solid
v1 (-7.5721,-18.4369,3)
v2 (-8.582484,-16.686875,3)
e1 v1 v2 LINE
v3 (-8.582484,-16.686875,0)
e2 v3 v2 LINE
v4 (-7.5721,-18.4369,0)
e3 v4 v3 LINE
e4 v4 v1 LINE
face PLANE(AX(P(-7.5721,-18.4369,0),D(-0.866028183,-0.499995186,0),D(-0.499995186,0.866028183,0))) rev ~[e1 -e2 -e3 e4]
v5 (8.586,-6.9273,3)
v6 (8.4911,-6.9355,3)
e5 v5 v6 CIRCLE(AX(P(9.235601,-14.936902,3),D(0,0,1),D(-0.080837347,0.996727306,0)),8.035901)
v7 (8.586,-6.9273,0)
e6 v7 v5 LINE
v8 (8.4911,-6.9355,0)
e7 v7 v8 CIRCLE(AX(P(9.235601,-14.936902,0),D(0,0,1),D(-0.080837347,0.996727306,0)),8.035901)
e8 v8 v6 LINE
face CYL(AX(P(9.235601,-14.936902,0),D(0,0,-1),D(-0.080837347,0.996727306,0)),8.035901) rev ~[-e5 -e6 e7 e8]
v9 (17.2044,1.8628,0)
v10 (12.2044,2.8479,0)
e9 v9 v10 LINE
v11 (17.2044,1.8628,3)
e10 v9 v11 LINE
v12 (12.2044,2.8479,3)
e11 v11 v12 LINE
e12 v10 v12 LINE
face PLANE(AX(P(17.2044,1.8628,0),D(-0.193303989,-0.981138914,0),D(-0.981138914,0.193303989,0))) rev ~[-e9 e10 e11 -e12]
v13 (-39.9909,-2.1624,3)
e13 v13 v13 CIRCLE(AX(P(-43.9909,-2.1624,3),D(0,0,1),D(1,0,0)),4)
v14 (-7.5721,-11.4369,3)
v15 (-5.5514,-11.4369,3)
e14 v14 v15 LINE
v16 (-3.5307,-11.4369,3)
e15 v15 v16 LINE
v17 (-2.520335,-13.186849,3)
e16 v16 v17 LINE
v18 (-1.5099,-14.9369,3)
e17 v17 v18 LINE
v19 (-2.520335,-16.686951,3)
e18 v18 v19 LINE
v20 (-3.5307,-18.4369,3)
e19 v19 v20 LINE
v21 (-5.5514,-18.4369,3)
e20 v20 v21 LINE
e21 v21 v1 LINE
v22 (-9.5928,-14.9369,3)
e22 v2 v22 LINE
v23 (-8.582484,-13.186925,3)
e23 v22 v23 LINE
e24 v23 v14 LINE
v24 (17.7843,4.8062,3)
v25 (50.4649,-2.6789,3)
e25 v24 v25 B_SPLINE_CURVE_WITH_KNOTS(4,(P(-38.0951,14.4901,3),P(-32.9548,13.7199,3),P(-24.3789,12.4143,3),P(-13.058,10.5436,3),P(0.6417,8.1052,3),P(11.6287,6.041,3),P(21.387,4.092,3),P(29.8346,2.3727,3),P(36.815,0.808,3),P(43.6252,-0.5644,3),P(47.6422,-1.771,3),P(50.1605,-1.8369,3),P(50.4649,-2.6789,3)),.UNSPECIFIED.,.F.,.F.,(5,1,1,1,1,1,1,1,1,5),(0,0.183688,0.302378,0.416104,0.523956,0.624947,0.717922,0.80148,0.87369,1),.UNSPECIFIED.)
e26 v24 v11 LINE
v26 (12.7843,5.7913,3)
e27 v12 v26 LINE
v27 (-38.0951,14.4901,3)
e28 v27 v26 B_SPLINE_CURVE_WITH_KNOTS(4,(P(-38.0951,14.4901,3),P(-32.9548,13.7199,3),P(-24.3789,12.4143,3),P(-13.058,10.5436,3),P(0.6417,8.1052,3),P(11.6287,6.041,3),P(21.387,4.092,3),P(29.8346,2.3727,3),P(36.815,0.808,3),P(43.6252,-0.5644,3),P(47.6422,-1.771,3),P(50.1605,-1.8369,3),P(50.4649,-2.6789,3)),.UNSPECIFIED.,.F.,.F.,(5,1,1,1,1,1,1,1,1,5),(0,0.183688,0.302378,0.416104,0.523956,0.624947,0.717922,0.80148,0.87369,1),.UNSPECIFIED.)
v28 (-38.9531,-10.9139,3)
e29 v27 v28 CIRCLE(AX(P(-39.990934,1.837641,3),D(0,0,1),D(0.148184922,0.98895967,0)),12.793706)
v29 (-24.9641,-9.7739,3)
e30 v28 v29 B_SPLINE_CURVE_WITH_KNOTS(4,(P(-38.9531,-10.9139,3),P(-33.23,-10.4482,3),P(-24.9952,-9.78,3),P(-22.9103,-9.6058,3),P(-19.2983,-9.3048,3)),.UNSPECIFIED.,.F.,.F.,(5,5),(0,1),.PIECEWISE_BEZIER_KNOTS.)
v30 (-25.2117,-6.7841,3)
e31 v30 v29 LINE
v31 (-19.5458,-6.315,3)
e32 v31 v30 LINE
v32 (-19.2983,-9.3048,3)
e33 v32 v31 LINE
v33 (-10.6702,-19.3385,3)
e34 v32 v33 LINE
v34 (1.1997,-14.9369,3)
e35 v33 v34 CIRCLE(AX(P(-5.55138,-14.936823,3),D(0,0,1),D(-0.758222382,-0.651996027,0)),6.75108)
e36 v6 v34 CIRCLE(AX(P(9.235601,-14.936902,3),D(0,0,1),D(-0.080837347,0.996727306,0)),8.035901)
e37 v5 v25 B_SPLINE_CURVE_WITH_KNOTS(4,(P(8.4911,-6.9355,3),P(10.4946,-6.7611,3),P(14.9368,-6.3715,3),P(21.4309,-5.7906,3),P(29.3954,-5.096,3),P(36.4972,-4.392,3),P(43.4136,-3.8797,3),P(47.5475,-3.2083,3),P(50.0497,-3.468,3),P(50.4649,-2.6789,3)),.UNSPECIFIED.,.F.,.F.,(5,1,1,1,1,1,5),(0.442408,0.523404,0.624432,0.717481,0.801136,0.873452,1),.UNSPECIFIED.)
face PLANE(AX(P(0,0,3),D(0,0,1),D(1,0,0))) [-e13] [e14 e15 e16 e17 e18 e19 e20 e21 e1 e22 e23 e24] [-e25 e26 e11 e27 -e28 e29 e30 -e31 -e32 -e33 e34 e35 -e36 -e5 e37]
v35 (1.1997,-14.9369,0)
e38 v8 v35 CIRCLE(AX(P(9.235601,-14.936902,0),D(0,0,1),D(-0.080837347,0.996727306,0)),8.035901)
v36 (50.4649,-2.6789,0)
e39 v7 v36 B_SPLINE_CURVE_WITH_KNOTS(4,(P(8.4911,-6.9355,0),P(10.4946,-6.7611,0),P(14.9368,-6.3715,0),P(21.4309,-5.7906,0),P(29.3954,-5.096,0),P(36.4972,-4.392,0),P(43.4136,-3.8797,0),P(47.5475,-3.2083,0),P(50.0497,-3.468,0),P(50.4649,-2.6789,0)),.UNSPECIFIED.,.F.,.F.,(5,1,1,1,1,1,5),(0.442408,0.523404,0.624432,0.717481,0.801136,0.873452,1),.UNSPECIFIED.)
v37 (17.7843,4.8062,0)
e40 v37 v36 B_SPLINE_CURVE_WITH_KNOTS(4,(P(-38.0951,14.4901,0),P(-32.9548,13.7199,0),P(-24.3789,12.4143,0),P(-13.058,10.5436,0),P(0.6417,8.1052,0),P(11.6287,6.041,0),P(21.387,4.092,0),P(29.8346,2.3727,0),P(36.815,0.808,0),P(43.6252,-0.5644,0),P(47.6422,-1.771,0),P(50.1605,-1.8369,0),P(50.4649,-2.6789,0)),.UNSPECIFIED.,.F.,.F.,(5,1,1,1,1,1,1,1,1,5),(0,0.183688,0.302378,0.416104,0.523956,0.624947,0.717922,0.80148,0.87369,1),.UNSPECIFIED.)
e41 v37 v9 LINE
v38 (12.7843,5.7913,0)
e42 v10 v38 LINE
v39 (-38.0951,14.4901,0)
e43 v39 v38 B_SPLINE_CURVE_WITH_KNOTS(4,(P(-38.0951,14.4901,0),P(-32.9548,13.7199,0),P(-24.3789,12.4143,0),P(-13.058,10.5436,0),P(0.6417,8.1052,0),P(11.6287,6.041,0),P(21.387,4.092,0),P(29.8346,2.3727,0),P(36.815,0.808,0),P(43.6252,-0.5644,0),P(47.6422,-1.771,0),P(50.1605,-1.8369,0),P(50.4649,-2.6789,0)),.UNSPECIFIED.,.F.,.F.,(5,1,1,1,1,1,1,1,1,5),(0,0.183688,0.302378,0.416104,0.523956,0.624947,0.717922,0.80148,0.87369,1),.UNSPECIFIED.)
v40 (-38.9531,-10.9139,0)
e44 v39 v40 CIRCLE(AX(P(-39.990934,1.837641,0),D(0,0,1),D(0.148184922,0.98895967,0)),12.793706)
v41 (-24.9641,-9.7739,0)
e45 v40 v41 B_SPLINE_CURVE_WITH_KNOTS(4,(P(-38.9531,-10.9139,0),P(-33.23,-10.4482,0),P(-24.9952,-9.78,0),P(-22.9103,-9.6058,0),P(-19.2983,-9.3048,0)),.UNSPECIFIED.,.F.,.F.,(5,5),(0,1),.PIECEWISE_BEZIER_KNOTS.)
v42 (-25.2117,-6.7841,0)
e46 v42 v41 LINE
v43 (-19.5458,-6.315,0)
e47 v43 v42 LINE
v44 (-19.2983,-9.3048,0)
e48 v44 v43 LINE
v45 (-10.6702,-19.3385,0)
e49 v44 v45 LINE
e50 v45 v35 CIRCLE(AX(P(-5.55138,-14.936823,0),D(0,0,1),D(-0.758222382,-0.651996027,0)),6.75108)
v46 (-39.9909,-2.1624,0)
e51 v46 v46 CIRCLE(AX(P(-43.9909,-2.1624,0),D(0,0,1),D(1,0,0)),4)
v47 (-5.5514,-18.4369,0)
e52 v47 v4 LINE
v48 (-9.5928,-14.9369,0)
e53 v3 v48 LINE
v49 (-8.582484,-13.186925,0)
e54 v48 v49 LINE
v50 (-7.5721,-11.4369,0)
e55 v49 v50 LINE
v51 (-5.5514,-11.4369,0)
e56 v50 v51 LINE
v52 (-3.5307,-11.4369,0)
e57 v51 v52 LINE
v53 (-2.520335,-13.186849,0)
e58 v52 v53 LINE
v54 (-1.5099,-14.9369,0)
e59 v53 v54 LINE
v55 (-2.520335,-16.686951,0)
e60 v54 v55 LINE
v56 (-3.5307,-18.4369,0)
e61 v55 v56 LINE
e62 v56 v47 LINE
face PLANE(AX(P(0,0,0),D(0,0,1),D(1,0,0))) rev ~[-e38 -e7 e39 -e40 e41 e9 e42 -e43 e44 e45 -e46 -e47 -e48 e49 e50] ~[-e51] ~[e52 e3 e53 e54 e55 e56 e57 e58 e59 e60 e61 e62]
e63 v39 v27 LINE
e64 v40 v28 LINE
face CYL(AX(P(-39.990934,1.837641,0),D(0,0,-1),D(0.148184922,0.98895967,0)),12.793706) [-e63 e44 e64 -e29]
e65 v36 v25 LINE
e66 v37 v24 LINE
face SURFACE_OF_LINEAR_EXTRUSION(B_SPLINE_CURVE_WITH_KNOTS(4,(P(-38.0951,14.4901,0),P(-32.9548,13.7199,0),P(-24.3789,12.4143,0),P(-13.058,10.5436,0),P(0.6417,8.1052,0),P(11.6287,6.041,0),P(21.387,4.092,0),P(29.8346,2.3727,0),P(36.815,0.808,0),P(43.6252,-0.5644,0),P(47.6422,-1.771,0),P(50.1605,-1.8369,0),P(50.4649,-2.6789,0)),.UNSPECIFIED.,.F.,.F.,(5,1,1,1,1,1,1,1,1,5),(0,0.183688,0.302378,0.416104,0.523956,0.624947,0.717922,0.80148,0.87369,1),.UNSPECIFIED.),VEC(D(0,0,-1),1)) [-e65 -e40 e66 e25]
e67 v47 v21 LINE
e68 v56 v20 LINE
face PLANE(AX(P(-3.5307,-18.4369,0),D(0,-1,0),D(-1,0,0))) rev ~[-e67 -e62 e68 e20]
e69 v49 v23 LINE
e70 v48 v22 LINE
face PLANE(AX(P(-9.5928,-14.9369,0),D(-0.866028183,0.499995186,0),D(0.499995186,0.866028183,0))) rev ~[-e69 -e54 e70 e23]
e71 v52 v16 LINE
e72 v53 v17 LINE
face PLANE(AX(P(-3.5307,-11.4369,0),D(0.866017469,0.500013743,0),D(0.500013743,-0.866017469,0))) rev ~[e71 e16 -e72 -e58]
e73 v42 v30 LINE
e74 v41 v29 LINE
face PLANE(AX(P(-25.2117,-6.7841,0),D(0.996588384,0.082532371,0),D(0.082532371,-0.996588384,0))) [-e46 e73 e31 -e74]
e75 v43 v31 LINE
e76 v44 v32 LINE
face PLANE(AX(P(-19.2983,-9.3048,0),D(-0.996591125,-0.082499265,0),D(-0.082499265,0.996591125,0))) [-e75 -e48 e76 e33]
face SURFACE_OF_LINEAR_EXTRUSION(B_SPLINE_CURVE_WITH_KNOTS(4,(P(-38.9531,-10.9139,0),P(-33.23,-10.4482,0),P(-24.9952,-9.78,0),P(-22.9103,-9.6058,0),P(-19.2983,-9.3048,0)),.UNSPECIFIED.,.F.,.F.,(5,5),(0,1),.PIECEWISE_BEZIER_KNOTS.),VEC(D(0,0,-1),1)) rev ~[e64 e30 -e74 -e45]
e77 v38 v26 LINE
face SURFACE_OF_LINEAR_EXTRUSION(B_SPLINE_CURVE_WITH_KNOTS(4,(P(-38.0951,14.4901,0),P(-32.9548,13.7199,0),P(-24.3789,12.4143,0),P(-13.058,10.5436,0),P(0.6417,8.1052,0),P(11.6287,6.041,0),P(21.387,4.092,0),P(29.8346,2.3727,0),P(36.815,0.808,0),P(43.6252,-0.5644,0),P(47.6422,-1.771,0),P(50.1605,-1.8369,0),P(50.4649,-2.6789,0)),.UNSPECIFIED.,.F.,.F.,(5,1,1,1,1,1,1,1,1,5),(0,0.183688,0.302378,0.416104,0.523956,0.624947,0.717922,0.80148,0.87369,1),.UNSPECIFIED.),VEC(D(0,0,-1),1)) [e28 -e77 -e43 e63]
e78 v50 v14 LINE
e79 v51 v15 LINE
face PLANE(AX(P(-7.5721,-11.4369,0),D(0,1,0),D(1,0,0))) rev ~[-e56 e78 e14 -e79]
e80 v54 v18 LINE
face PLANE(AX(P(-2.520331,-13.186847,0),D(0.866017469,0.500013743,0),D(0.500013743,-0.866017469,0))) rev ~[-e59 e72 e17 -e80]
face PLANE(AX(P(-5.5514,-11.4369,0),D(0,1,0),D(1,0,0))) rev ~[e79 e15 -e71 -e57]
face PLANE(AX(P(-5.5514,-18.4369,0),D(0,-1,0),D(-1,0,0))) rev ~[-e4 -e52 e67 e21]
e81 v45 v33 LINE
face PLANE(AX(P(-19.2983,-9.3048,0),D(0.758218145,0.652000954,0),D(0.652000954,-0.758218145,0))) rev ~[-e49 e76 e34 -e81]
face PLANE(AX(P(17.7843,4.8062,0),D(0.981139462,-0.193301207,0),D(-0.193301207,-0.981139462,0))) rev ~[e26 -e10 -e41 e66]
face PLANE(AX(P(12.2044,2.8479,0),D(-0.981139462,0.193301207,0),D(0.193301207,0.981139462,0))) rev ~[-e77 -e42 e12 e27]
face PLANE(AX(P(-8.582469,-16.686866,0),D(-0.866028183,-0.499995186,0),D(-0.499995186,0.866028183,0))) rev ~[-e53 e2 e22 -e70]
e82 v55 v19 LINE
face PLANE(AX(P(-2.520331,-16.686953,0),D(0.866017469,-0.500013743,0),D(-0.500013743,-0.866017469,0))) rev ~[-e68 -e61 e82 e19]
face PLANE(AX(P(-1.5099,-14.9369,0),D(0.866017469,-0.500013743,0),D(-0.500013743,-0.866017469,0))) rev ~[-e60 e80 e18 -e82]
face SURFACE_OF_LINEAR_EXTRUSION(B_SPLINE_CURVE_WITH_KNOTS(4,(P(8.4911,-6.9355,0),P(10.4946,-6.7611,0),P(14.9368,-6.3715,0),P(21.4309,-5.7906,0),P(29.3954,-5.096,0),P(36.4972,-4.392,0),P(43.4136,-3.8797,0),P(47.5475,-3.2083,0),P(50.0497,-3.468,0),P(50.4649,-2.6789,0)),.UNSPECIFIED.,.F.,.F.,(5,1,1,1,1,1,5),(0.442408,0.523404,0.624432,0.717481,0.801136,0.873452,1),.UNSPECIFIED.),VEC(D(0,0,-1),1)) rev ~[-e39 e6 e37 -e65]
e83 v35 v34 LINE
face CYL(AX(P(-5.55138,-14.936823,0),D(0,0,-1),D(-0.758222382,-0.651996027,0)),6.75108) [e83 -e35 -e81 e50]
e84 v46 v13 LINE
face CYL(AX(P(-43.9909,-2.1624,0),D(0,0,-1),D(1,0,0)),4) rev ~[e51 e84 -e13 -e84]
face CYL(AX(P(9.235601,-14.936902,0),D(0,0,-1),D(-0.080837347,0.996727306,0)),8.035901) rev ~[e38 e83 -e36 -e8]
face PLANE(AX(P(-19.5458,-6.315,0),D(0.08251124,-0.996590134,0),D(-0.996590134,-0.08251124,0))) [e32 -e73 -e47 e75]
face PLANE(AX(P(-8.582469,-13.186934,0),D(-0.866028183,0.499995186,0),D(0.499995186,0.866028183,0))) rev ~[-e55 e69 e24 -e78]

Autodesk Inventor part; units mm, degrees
ref_plane "YZ Plane" through (0, 0, 0) normal (1, 0, 0) x (0, 1, 0)
ref_plane "XZ Plane" through (0, 0, 0) normal (0, 1, 0) x (-1, 0, 0)
ref_plane "XY Plane" through (0, 0, 0) normal (0, 0, 1) x (1, 0, 0)
sketch "Sketch1" plane through (0, 0, 0) normal (0, 0, 1) x (1, 0, 0)
  spline S0 degree 2 poles (-26.5248, 6.4808) (-26.4161, 6.4647) (-26.3074, 6.4486) knots 0 0 0 1 1 1
  line L0 (-26.3296, 6.4519) -> (-26.2853, 6.4453) construction
  arc A0 (-26.2897, 6.4459) -> (-26.3252, 6.4512) centre (-41.887, -98.3753) ccw construction
  line L1 (-25.2117, -6.7841) -> (-24.9641, -9.7739)
  line L2 (-24.9641, -9.7739) -> (-19.2983, -9.3048)
  line L3 (-19.2983, -9.3048) -> (-19.5458, -6.315)
  line L4 (12.2044, 2.8479) -> (12.7843, 5.7913)
  line L5 (17.2044, 1.8628) -> (12.2044, 2.8479)
  line L6 (17.7843, 4.8062) -> (17.2044, 1.8628)
  line L7 (12.7843, 5.7913) -> (17.7843, 4.8062)
  spline S1 degree 4 poles (-38.0951, 14.4901) (-32.9548, 13.7199) (-24.3789, 12.4143) (-13.058, 10.5436) (0.6417, 8.1052) (11.6287, 6.041) (21.387, 4.092) (29.8346, 2.3727) (36.815, 0.808) (43.6252, -0.5644) (47.6422, -1.771) (50.1605, -1.8369) (50.4649, -2.6789) knots 0 0 0 0 0 0.183688 0.302378 0.416104 0.523956 0.624947 0.717922 0.80148 0.87369 1 1 1 1 1
  line L8 (-19.5458, -6.315) -> (-25.2117, -6.7841)
  arc A1 (-38.0951, 14.4901) -> (-38.9531, -10.9139) centre (-39.9909, 1.8376) ccw
  line L9 (-39.9909, 1.8376) -> (-39.9909, -2.1624)
  line L10 (-39.9909, -2.1624) -> (-43.9909, -2.1624)
  circle A2 centre (-43.9909, -2.1624) radius 4
  arc A3 (-10.6702, -19.3385) -> (1.1997, -14.9369) centre (-5.5514, -14.9369) ccw
  circle A4 centre (-5.5514, -14.9369) radius 3.5
  line L11 (-19.2983, -9.3048) -> (-10.6702, -19.3385)
  arc A5 (8.586, -6.9273) -> (1.1997, -14.9369) centre (9.2356, -14.9369) ccw
  spline S2 degree 4 poles (-38.9531, -10.9139) (-33.23, -10.4482) (-24.9952, -9.78) (-22.9103, -9.6058) (-19.2983, -9.3048) knots 0 0 0 0 0 1 1 1 1 1
  spline S3 degree 4 poles (8.4911, -6.9355) (10.4946, -6.7611) (14.9368, -6.3715) (21.4309, -5.7906) (29.3954, -5.096) (36.4972, -4.392) (43.4136, -3.8797) (47.5475, -3.2083) (50.0497, -3.468) (50.4649, -2.6789) knots 0.442408 0.442408 0.442408 0.442408 0.442408 0.523404 0.624432 0.717481 0.801136 0.873452 1 1 1 1 1
  line L12 (-21.2865, -9.4705) -> (-17.3101, -9.139) construction
  arc A6 (-17.7077, -9.1723) -> (-20.8888, -9.4375) centre (811.3613, -9974.7453) ccw construction
  line L13 (3.8187, -7.3423) -> (13.1635, -6.5288) construction
  arc A7 (4.7531, -7.2593) -> (12.2289, -6.6085) centre (-354.4003, 4161.6553) ccw construction
  line L14 (-1.5099, -14.9369) -> (-3.5307, -18.4369)
  line L15 (-3.5307, -18.4369) -> (-7.5721, -18.4369)
  line L16 (-7.5721, -18.4369) -> (-9.5928, -14.9369)
  line L17 (-9.5928, -14.9369) -> (-7.5721, -11.4369)
  line L18 (-7.5721, -11.4369) -> (-3.5307, -11.4369)
  line L19 (-3.5307, -11.4369) -> (-1.5099, -14.9369)
  point P0 (0, 0)
  point P1 (-3.4702, -1.6741)
  point P2 (-11.7791, -8.6729)
  point P3 (0.4579, -7.6289)
  point P4 (30.1549, -5.0069)
  point P5 (37.3429, -4.3499)
  point P6 (43.0189, -3.8219)
  point P7 (47.1229, -3.4349)
  point P8 (49.6039, -3.1979)
  point P9 (-24.1061, 12.3331)
  point P10 (-10.9541, 10.1431)
  point P11 (1.2109, 7.9771)
  point P12 (12.2659, 5.8921)
  point P13 (22.0909, 3.9421)
  point P14 (30.5809, 2.1811)
  point P15 (37.6519, 0.6571)
  point P16 (43.2259, -0.5789)
  point P17 (47.2519, -1.4909)
  point P18 (49.6819, -2.0489)
  point P19 (-52.7771, 2.2732)
  point P20 (8.5548, -0.5944)
  point P21 (7.5624, -0.6892)
  point P22 (5.9208, -0.844)
  point P23 (3.6504, -1.0552)
  point P24 (0.7752, -1.318)
  point P25 (-2.6688, -1.6288)
  point P26 (-6.6432, -1.9804)
  point P27 (-11.1036, -2.3668)
  point P28 (-15.9984, -2.7844)
  point P29 (-21.2724, -3.2248)
  point P30 (8.586, -0.1348)
  point P31 (7.614, 0.0884)
  point P32 (6.0036, 0.4532)
  point P33 (3.774, 0.9476)
  point P34 (0.9456, 1.5572)
  point P35 (-2.4504, 2.2616)
  point P36 (-6.3804, 3.0416)
  point P37 (-10.8024, 3.8756)
  point P38 (-15.6684, 4.742)
  point P39 (-20.9292, 5.618)
  point P40 (8.8992, -0.3868)
  point P41 (-26.868, -3.6808)
  point P42 (49.6819, -2.6199)
  point P43 (47.2519, -2.4568)
  point P44 (43.2259, -2.1907)
  point P45 (37.6519, -1.832)
  point P46 (30.5809, -1.3934)
  point P47 (22.0909, -0.8963)
  point P48 (12.2659, -0.3564)
  point P49 (1.2109, 0.2067)
  point P50 (-10.9541, 0.7703)
  point P51 (-24.1061, 1.3154)
  point P52 (-38.0951, 1.823)
  point P53 (50.4649, -3.1199)
  point P54 (-53.5871, -12.0749)
  point P55 (-52.7771, 16.5571)
  point P56 (50.4649, -2.2379)
  point P57 (8.4911, -6.9355)
  dimension "d0" = 3
  dimension "d1" = 5
  dimension "d2" = 52.7751
  dimension "d3" = 3
  dimension "d4" = 5.6658
  dimension "d5" = 4
  dimension "d6" = 4
  dimension "d7" = 8
  dimension "d8" = 7
extrude "Extrusion2" add sketch "Sketch1" along normal blind 3 contours L1 S2 A1 S1 L4 L5 L6 S3 A5 A3 L11 L3 L8
properties part number "2P.03.01.07.JW.FlapRibMid" material "Wood (Walnut)"
